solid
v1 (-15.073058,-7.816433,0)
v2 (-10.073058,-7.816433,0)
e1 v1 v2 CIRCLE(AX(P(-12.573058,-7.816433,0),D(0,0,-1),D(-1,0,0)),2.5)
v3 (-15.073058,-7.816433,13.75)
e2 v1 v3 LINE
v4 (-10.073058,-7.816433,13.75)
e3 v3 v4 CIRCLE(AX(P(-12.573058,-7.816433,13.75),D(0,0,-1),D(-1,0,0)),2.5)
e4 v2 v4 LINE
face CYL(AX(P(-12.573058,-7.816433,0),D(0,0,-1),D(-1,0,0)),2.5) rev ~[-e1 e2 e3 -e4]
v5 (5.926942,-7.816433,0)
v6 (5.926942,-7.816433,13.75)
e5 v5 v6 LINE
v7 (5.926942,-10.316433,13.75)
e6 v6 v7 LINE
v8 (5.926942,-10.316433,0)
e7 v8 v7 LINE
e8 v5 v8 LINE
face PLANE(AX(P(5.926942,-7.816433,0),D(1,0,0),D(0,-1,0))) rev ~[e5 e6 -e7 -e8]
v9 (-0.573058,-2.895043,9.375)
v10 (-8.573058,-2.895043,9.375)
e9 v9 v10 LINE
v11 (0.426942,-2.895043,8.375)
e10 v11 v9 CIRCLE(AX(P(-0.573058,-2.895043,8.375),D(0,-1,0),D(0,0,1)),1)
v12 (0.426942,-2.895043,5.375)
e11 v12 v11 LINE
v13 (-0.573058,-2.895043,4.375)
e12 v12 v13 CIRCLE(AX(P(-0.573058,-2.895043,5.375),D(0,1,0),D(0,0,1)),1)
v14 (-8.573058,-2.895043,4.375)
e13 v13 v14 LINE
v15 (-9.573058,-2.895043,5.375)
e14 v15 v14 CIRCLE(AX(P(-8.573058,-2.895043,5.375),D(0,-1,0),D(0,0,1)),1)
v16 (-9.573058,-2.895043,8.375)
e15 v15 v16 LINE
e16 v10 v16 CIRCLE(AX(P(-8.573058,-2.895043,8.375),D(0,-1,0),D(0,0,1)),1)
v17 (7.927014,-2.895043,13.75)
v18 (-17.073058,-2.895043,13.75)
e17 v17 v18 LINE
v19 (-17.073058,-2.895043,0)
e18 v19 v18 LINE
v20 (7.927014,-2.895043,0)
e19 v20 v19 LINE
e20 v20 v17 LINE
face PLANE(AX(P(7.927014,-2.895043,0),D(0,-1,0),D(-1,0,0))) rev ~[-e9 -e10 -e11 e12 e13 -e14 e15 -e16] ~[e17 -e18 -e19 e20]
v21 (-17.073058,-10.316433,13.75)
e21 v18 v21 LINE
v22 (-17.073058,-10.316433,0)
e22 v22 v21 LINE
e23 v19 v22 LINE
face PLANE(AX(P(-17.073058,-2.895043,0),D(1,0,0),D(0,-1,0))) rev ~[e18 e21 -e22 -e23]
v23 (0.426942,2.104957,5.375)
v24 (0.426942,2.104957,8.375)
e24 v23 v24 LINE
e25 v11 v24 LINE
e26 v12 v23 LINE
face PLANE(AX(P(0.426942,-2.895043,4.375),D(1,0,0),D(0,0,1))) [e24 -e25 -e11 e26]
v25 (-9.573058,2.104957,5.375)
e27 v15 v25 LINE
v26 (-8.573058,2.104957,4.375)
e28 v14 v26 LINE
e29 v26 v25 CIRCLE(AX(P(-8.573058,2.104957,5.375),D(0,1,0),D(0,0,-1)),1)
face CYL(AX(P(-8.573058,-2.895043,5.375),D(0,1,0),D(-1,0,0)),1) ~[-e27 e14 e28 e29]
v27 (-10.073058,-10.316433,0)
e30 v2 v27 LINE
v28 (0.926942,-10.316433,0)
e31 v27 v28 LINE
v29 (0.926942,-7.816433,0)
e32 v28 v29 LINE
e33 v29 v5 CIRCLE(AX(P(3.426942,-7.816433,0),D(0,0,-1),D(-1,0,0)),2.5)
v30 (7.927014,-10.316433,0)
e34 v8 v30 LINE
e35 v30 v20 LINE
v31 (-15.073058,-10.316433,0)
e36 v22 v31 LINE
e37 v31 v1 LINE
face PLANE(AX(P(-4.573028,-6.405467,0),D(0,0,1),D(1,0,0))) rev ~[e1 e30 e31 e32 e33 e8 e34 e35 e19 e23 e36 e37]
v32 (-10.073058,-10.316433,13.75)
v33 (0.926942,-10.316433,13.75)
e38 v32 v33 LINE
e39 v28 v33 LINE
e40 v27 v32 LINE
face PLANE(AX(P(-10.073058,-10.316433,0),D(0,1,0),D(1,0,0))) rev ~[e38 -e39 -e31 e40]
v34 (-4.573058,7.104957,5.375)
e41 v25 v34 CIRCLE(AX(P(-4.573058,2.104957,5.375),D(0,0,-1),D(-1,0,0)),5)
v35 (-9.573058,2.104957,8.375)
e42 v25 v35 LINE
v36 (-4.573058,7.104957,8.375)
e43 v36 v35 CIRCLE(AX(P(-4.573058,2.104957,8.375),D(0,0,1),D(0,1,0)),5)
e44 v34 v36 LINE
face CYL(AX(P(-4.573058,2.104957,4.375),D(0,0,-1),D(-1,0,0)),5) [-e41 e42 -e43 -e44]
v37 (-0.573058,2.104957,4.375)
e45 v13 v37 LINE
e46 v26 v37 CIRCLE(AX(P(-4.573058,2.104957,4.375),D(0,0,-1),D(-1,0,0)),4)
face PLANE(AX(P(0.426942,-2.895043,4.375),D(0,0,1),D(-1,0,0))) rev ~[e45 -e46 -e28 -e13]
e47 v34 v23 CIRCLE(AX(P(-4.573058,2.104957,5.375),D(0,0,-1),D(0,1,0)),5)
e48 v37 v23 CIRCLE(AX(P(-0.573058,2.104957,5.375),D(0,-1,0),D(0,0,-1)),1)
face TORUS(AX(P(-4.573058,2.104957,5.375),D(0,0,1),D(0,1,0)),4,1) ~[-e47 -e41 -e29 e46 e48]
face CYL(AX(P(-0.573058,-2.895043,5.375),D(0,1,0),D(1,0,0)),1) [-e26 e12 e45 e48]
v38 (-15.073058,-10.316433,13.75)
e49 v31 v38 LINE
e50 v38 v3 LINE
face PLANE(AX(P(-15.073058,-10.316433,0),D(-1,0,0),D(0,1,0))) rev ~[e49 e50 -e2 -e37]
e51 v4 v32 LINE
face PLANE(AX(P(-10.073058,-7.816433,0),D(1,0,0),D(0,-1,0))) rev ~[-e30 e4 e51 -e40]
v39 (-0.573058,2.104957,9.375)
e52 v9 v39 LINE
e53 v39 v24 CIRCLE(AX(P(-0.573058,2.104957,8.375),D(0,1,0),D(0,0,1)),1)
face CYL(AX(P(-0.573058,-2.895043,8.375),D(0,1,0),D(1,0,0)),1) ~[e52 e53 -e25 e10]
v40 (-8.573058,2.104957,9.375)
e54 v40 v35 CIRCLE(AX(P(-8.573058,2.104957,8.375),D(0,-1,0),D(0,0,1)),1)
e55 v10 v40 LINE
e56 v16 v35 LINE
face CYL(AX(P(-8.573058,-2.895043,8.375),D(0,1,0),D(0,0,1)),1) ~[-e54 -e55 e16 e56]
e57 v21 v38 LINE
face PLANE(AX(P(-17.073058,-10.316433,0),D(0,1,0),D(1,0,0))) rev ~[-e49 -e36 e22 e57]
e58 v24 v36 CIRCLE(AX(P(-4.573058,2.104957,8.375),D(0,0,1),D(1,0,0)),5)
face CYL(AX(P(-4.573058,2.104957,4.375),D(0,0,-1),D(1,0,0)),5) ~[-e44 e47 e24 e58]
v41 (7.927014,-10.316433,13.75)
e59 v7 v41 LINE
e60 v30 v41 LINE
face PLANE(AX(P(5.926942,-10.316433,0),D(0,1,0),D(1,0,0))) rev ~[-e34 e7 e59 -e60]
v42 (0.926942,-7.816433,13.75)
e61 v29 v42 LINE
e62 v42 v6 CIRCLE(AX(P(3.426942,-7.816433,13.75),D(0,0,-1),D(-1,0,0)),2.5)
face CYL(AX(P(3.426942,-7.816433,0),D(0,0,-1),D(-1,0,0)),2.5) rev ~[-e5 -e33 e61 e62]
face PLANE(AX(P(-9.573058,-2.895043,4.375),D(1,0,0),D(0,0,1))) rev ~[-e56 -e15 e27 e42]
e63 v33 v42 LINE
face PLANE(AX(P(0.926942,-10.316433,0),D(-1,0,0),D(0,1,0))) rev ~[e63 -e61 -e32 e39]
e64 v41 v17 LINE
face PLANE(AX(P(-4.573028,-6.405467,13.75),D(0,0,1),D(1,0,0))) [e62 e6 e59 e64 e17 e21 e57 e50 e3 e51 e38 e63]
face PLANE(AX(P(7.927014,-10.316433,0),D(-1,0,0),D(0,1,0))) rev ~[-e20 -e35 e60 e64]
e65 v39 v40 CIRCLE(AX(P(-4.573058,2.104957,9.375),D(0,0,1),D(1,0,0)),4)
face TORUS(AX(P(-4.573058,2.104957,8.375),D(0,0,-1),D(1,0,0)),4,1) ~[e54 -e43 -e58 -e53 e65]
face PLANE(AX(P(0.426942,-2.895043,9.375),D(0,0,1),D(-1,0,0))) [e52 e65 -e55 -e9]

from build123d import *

# Parameters (mm, degrees)
F1_DEPTH     = 13.75
F2_W         = 10
F2_H         = 5
F3_DEPTH     = 10
F4_R         = 1
F5_T1_DEPTH  = 5
F5_T4_ANGLE  = 90
F5_T6_ANGLE  = 90
F5_T8_ANGLE  = 90
F5_T10_ANGLE = 90


# Not quite as in the source:
# - a fillet or chamfer that OpenCascade refuses, or shapes differently, is made with other operations: its cross-section is extruded or revolved along the edge and cut away or added


with BuildPart() as f1:
    # F0 (on Top) → F1 (new body)
    with BuildSketch(Plane.XY):
        with BuildLine():
            Line((7.9270144597, -2.8950429987), (-17.0730578044, -2.8950429987))
            Line((-17.0730578044, -2.8950429987), (-17.0730578044, -7.8164328754))
            Line((-17.0730578044, -7.8164328754), (-17.0730578044, -10.3164328754))
            Line((-17.0730578044, -10.3164328754), (-15.0730578044, -10.3164328754))
            Line((-15.0730578044, -10.3164328754), (-15.0730578044, -7.8164328754))
            ThreePointArc((-15.0730578044, -7.8164328754), (-12.5730578044, -5.3164328754), (-10.0730578044, -7.8164328754))
            Line((-10.0730578044, -7.8164328754), (-10.0730578044, -10.3164328754))
            Line((-10.0730578044, -10.3164328754), (0.9269421956, -10.3164328754))
            Line((0.9269421956, -10.3164328754), (0.9269421956, -7.8164328754))
            ThreePointArc((0.9269421956, -7.8164328754), (3.4269421956, -5.3164328754), (5.9269421956, -7.8164328754))
            Line((5.9269421956, -7.8164328754), (5.9269421956, -10.3164328754))
            Line((5.9269421956, -10.3164328754), (7.9270144597, -10.3164328754))
            Line((7.9270144597, -10.3164328754), (7.9270144597, -7.8164328754))
            Line((7.9270144597, -7.8164328754), (7.9270144597, -2.8950429987))
        make_face()
    extrude(amount=F1_DEPTH)

    # F2 (on face) → F3 (join)
    with BuildSketch(Plane(origin=(0, -2.8950429987, 0), x_dir=(-1, 0, 0), z_dir=(0, 1, 0))):
        with Locations((4.5730578044, 6.875)):
            Rectangle(F2_W, F2_H)
    extrude(amount=F3_DEPTH)

    # F4
    f4_edges = [f1.edges().sort_by_distance(p)[0] for p in [
        (-4.573058, 7.104957, 9.375),
        (-4.573058, 7.104957, 4.375),
        (-9.573058, 2.104957, 4.375),
        (-9.573058, 2.104957, 9.375),
        (0.426942, 2.104957, 9.375),
        (0.426942, 2.104957, 4.375),
    ]]
    fillet(f4_edges, radius=F4_R)

    # F5: fillet of radius 5 on 2 edges, made by hand

    # F5_s2 → F5_t1 (cut)
    with BuildSketch(Plane.XY.offset(4.375)):
        with BuildLine():
            ThreePointArc((-9.5730578044, 2.1049570013), (-8.1085917103, 5.6404909072), (-4.5730578044, 7.1049570013))
            Line((-4.5730578044, 7.1049570013), (-9.5730578044, 7.1049570013))
            Line((-9.5730578044, 7.1049570013), (-9.5730578044, 2.1049570013))
        make_face()
        with BuildLine():
            ThreePointArc((0.4269421956, 2.1049570013), (-1.0375238985, 5.6404909072), (-4.5730578044, 7.1049570013))
            Line((-4.5730578044, 7.1049570013), (0.4269421956, 7.1049570013))
            Line((0.4269421956, 7.1049570013), (0.4269421956, 2.1049570013))
        make_face()
    extrude(amount=F5_T1_DEPTH, mode=Mode.SUBTRACT)

    # F5_s3 → F5_t4 (revolve, cut)
    with BuildSketch(Plane.XZ.offset(-2.1049570013)):
        with BuildLine():
            ThreePointArc((-0.5730578044, 9.375), (0.1340489768, 9.0821067812), (0.4269421956, 8.375))
            Line((0.4269421956, 8.375), (0.4269421956, 9.375))
            Line((0.4269421956, 9.375), (-0.5730578044, 9.375))
        make_face()
    revolve(axis=Axis((-4.5730578044, 2.1049570013, 9.375), (0, 0, 1)), revolution_arc=F5_T4_ANGLE, mode=Mode.SUBTRACT)

    # F5_s5 → F5_t6 (revolve, cut)
    with BuildSketch(Plane.YZ.offset(-4.5730578044)):
        with BuildLine():
            ThreePointArc((6.1049570013, 4.375), (6.8120637825, 4.6678932188), (7.1049570013, 5.375))
            Line((7.1049570013, 5.375), (7.1049570013, 4.375))
            Line((7.1049570013, 4.375), (6.1049570013, 4.375))
        make_face()
    revolve(axis=Axis((-4.5730578044, 2.1049570013, 4.375), (0, 0, -1)), revolution_arc=F5_T6_ANGLE, mode=Mode.SUBTRACT)

    # F5_s7 → F5_t8 (revolve, cut)
    with BuildSketch(Plane.XZ.offset(-2.1049570013)):
        with BuildLine():
            ThreePointArc((-8.5730578044, 4.375), (-9.2801645856, 4.6678932188), (-9.5730578044, 5.375))
            Line((-9.5730578044, 5.375), (-9.5730578044, 4.375))
            Line((-9.5730578044, 4.375), (-8.5730578044, 4.375))
        make_face()
    revolve(axis=Axis((-4.5730578044, 2.1049570013, 4.375), (0, 0, -1)), revolution_arc=F5_T8_ANGLE, mode=Mode.SUBTRACT)

    # F5_s9 → F5_t10 (revolve, cut)
    with BuildSketch(Plane.YZ.offset(-4.5730578044)):
        with BuildLine():
            ThreePointArc((6.1049570013, 9.375), (6.8120637825, 9.0821067812), (7.1049570013, 8.375))
            Line((7.1049570013, 8.375), (7.1049570013, 9.375))
            Line((7.1049570013, 9.375), (6.1049570013, 9.375))
        make_face()
    revolve(axis=Axis((-4.5730578044, 2.1049570013, 9.375), (0, 0, 1)), revolution_arc=F5_T10_ANGLE, mode=Mode.SUBTRACT)


solid = f1.part
